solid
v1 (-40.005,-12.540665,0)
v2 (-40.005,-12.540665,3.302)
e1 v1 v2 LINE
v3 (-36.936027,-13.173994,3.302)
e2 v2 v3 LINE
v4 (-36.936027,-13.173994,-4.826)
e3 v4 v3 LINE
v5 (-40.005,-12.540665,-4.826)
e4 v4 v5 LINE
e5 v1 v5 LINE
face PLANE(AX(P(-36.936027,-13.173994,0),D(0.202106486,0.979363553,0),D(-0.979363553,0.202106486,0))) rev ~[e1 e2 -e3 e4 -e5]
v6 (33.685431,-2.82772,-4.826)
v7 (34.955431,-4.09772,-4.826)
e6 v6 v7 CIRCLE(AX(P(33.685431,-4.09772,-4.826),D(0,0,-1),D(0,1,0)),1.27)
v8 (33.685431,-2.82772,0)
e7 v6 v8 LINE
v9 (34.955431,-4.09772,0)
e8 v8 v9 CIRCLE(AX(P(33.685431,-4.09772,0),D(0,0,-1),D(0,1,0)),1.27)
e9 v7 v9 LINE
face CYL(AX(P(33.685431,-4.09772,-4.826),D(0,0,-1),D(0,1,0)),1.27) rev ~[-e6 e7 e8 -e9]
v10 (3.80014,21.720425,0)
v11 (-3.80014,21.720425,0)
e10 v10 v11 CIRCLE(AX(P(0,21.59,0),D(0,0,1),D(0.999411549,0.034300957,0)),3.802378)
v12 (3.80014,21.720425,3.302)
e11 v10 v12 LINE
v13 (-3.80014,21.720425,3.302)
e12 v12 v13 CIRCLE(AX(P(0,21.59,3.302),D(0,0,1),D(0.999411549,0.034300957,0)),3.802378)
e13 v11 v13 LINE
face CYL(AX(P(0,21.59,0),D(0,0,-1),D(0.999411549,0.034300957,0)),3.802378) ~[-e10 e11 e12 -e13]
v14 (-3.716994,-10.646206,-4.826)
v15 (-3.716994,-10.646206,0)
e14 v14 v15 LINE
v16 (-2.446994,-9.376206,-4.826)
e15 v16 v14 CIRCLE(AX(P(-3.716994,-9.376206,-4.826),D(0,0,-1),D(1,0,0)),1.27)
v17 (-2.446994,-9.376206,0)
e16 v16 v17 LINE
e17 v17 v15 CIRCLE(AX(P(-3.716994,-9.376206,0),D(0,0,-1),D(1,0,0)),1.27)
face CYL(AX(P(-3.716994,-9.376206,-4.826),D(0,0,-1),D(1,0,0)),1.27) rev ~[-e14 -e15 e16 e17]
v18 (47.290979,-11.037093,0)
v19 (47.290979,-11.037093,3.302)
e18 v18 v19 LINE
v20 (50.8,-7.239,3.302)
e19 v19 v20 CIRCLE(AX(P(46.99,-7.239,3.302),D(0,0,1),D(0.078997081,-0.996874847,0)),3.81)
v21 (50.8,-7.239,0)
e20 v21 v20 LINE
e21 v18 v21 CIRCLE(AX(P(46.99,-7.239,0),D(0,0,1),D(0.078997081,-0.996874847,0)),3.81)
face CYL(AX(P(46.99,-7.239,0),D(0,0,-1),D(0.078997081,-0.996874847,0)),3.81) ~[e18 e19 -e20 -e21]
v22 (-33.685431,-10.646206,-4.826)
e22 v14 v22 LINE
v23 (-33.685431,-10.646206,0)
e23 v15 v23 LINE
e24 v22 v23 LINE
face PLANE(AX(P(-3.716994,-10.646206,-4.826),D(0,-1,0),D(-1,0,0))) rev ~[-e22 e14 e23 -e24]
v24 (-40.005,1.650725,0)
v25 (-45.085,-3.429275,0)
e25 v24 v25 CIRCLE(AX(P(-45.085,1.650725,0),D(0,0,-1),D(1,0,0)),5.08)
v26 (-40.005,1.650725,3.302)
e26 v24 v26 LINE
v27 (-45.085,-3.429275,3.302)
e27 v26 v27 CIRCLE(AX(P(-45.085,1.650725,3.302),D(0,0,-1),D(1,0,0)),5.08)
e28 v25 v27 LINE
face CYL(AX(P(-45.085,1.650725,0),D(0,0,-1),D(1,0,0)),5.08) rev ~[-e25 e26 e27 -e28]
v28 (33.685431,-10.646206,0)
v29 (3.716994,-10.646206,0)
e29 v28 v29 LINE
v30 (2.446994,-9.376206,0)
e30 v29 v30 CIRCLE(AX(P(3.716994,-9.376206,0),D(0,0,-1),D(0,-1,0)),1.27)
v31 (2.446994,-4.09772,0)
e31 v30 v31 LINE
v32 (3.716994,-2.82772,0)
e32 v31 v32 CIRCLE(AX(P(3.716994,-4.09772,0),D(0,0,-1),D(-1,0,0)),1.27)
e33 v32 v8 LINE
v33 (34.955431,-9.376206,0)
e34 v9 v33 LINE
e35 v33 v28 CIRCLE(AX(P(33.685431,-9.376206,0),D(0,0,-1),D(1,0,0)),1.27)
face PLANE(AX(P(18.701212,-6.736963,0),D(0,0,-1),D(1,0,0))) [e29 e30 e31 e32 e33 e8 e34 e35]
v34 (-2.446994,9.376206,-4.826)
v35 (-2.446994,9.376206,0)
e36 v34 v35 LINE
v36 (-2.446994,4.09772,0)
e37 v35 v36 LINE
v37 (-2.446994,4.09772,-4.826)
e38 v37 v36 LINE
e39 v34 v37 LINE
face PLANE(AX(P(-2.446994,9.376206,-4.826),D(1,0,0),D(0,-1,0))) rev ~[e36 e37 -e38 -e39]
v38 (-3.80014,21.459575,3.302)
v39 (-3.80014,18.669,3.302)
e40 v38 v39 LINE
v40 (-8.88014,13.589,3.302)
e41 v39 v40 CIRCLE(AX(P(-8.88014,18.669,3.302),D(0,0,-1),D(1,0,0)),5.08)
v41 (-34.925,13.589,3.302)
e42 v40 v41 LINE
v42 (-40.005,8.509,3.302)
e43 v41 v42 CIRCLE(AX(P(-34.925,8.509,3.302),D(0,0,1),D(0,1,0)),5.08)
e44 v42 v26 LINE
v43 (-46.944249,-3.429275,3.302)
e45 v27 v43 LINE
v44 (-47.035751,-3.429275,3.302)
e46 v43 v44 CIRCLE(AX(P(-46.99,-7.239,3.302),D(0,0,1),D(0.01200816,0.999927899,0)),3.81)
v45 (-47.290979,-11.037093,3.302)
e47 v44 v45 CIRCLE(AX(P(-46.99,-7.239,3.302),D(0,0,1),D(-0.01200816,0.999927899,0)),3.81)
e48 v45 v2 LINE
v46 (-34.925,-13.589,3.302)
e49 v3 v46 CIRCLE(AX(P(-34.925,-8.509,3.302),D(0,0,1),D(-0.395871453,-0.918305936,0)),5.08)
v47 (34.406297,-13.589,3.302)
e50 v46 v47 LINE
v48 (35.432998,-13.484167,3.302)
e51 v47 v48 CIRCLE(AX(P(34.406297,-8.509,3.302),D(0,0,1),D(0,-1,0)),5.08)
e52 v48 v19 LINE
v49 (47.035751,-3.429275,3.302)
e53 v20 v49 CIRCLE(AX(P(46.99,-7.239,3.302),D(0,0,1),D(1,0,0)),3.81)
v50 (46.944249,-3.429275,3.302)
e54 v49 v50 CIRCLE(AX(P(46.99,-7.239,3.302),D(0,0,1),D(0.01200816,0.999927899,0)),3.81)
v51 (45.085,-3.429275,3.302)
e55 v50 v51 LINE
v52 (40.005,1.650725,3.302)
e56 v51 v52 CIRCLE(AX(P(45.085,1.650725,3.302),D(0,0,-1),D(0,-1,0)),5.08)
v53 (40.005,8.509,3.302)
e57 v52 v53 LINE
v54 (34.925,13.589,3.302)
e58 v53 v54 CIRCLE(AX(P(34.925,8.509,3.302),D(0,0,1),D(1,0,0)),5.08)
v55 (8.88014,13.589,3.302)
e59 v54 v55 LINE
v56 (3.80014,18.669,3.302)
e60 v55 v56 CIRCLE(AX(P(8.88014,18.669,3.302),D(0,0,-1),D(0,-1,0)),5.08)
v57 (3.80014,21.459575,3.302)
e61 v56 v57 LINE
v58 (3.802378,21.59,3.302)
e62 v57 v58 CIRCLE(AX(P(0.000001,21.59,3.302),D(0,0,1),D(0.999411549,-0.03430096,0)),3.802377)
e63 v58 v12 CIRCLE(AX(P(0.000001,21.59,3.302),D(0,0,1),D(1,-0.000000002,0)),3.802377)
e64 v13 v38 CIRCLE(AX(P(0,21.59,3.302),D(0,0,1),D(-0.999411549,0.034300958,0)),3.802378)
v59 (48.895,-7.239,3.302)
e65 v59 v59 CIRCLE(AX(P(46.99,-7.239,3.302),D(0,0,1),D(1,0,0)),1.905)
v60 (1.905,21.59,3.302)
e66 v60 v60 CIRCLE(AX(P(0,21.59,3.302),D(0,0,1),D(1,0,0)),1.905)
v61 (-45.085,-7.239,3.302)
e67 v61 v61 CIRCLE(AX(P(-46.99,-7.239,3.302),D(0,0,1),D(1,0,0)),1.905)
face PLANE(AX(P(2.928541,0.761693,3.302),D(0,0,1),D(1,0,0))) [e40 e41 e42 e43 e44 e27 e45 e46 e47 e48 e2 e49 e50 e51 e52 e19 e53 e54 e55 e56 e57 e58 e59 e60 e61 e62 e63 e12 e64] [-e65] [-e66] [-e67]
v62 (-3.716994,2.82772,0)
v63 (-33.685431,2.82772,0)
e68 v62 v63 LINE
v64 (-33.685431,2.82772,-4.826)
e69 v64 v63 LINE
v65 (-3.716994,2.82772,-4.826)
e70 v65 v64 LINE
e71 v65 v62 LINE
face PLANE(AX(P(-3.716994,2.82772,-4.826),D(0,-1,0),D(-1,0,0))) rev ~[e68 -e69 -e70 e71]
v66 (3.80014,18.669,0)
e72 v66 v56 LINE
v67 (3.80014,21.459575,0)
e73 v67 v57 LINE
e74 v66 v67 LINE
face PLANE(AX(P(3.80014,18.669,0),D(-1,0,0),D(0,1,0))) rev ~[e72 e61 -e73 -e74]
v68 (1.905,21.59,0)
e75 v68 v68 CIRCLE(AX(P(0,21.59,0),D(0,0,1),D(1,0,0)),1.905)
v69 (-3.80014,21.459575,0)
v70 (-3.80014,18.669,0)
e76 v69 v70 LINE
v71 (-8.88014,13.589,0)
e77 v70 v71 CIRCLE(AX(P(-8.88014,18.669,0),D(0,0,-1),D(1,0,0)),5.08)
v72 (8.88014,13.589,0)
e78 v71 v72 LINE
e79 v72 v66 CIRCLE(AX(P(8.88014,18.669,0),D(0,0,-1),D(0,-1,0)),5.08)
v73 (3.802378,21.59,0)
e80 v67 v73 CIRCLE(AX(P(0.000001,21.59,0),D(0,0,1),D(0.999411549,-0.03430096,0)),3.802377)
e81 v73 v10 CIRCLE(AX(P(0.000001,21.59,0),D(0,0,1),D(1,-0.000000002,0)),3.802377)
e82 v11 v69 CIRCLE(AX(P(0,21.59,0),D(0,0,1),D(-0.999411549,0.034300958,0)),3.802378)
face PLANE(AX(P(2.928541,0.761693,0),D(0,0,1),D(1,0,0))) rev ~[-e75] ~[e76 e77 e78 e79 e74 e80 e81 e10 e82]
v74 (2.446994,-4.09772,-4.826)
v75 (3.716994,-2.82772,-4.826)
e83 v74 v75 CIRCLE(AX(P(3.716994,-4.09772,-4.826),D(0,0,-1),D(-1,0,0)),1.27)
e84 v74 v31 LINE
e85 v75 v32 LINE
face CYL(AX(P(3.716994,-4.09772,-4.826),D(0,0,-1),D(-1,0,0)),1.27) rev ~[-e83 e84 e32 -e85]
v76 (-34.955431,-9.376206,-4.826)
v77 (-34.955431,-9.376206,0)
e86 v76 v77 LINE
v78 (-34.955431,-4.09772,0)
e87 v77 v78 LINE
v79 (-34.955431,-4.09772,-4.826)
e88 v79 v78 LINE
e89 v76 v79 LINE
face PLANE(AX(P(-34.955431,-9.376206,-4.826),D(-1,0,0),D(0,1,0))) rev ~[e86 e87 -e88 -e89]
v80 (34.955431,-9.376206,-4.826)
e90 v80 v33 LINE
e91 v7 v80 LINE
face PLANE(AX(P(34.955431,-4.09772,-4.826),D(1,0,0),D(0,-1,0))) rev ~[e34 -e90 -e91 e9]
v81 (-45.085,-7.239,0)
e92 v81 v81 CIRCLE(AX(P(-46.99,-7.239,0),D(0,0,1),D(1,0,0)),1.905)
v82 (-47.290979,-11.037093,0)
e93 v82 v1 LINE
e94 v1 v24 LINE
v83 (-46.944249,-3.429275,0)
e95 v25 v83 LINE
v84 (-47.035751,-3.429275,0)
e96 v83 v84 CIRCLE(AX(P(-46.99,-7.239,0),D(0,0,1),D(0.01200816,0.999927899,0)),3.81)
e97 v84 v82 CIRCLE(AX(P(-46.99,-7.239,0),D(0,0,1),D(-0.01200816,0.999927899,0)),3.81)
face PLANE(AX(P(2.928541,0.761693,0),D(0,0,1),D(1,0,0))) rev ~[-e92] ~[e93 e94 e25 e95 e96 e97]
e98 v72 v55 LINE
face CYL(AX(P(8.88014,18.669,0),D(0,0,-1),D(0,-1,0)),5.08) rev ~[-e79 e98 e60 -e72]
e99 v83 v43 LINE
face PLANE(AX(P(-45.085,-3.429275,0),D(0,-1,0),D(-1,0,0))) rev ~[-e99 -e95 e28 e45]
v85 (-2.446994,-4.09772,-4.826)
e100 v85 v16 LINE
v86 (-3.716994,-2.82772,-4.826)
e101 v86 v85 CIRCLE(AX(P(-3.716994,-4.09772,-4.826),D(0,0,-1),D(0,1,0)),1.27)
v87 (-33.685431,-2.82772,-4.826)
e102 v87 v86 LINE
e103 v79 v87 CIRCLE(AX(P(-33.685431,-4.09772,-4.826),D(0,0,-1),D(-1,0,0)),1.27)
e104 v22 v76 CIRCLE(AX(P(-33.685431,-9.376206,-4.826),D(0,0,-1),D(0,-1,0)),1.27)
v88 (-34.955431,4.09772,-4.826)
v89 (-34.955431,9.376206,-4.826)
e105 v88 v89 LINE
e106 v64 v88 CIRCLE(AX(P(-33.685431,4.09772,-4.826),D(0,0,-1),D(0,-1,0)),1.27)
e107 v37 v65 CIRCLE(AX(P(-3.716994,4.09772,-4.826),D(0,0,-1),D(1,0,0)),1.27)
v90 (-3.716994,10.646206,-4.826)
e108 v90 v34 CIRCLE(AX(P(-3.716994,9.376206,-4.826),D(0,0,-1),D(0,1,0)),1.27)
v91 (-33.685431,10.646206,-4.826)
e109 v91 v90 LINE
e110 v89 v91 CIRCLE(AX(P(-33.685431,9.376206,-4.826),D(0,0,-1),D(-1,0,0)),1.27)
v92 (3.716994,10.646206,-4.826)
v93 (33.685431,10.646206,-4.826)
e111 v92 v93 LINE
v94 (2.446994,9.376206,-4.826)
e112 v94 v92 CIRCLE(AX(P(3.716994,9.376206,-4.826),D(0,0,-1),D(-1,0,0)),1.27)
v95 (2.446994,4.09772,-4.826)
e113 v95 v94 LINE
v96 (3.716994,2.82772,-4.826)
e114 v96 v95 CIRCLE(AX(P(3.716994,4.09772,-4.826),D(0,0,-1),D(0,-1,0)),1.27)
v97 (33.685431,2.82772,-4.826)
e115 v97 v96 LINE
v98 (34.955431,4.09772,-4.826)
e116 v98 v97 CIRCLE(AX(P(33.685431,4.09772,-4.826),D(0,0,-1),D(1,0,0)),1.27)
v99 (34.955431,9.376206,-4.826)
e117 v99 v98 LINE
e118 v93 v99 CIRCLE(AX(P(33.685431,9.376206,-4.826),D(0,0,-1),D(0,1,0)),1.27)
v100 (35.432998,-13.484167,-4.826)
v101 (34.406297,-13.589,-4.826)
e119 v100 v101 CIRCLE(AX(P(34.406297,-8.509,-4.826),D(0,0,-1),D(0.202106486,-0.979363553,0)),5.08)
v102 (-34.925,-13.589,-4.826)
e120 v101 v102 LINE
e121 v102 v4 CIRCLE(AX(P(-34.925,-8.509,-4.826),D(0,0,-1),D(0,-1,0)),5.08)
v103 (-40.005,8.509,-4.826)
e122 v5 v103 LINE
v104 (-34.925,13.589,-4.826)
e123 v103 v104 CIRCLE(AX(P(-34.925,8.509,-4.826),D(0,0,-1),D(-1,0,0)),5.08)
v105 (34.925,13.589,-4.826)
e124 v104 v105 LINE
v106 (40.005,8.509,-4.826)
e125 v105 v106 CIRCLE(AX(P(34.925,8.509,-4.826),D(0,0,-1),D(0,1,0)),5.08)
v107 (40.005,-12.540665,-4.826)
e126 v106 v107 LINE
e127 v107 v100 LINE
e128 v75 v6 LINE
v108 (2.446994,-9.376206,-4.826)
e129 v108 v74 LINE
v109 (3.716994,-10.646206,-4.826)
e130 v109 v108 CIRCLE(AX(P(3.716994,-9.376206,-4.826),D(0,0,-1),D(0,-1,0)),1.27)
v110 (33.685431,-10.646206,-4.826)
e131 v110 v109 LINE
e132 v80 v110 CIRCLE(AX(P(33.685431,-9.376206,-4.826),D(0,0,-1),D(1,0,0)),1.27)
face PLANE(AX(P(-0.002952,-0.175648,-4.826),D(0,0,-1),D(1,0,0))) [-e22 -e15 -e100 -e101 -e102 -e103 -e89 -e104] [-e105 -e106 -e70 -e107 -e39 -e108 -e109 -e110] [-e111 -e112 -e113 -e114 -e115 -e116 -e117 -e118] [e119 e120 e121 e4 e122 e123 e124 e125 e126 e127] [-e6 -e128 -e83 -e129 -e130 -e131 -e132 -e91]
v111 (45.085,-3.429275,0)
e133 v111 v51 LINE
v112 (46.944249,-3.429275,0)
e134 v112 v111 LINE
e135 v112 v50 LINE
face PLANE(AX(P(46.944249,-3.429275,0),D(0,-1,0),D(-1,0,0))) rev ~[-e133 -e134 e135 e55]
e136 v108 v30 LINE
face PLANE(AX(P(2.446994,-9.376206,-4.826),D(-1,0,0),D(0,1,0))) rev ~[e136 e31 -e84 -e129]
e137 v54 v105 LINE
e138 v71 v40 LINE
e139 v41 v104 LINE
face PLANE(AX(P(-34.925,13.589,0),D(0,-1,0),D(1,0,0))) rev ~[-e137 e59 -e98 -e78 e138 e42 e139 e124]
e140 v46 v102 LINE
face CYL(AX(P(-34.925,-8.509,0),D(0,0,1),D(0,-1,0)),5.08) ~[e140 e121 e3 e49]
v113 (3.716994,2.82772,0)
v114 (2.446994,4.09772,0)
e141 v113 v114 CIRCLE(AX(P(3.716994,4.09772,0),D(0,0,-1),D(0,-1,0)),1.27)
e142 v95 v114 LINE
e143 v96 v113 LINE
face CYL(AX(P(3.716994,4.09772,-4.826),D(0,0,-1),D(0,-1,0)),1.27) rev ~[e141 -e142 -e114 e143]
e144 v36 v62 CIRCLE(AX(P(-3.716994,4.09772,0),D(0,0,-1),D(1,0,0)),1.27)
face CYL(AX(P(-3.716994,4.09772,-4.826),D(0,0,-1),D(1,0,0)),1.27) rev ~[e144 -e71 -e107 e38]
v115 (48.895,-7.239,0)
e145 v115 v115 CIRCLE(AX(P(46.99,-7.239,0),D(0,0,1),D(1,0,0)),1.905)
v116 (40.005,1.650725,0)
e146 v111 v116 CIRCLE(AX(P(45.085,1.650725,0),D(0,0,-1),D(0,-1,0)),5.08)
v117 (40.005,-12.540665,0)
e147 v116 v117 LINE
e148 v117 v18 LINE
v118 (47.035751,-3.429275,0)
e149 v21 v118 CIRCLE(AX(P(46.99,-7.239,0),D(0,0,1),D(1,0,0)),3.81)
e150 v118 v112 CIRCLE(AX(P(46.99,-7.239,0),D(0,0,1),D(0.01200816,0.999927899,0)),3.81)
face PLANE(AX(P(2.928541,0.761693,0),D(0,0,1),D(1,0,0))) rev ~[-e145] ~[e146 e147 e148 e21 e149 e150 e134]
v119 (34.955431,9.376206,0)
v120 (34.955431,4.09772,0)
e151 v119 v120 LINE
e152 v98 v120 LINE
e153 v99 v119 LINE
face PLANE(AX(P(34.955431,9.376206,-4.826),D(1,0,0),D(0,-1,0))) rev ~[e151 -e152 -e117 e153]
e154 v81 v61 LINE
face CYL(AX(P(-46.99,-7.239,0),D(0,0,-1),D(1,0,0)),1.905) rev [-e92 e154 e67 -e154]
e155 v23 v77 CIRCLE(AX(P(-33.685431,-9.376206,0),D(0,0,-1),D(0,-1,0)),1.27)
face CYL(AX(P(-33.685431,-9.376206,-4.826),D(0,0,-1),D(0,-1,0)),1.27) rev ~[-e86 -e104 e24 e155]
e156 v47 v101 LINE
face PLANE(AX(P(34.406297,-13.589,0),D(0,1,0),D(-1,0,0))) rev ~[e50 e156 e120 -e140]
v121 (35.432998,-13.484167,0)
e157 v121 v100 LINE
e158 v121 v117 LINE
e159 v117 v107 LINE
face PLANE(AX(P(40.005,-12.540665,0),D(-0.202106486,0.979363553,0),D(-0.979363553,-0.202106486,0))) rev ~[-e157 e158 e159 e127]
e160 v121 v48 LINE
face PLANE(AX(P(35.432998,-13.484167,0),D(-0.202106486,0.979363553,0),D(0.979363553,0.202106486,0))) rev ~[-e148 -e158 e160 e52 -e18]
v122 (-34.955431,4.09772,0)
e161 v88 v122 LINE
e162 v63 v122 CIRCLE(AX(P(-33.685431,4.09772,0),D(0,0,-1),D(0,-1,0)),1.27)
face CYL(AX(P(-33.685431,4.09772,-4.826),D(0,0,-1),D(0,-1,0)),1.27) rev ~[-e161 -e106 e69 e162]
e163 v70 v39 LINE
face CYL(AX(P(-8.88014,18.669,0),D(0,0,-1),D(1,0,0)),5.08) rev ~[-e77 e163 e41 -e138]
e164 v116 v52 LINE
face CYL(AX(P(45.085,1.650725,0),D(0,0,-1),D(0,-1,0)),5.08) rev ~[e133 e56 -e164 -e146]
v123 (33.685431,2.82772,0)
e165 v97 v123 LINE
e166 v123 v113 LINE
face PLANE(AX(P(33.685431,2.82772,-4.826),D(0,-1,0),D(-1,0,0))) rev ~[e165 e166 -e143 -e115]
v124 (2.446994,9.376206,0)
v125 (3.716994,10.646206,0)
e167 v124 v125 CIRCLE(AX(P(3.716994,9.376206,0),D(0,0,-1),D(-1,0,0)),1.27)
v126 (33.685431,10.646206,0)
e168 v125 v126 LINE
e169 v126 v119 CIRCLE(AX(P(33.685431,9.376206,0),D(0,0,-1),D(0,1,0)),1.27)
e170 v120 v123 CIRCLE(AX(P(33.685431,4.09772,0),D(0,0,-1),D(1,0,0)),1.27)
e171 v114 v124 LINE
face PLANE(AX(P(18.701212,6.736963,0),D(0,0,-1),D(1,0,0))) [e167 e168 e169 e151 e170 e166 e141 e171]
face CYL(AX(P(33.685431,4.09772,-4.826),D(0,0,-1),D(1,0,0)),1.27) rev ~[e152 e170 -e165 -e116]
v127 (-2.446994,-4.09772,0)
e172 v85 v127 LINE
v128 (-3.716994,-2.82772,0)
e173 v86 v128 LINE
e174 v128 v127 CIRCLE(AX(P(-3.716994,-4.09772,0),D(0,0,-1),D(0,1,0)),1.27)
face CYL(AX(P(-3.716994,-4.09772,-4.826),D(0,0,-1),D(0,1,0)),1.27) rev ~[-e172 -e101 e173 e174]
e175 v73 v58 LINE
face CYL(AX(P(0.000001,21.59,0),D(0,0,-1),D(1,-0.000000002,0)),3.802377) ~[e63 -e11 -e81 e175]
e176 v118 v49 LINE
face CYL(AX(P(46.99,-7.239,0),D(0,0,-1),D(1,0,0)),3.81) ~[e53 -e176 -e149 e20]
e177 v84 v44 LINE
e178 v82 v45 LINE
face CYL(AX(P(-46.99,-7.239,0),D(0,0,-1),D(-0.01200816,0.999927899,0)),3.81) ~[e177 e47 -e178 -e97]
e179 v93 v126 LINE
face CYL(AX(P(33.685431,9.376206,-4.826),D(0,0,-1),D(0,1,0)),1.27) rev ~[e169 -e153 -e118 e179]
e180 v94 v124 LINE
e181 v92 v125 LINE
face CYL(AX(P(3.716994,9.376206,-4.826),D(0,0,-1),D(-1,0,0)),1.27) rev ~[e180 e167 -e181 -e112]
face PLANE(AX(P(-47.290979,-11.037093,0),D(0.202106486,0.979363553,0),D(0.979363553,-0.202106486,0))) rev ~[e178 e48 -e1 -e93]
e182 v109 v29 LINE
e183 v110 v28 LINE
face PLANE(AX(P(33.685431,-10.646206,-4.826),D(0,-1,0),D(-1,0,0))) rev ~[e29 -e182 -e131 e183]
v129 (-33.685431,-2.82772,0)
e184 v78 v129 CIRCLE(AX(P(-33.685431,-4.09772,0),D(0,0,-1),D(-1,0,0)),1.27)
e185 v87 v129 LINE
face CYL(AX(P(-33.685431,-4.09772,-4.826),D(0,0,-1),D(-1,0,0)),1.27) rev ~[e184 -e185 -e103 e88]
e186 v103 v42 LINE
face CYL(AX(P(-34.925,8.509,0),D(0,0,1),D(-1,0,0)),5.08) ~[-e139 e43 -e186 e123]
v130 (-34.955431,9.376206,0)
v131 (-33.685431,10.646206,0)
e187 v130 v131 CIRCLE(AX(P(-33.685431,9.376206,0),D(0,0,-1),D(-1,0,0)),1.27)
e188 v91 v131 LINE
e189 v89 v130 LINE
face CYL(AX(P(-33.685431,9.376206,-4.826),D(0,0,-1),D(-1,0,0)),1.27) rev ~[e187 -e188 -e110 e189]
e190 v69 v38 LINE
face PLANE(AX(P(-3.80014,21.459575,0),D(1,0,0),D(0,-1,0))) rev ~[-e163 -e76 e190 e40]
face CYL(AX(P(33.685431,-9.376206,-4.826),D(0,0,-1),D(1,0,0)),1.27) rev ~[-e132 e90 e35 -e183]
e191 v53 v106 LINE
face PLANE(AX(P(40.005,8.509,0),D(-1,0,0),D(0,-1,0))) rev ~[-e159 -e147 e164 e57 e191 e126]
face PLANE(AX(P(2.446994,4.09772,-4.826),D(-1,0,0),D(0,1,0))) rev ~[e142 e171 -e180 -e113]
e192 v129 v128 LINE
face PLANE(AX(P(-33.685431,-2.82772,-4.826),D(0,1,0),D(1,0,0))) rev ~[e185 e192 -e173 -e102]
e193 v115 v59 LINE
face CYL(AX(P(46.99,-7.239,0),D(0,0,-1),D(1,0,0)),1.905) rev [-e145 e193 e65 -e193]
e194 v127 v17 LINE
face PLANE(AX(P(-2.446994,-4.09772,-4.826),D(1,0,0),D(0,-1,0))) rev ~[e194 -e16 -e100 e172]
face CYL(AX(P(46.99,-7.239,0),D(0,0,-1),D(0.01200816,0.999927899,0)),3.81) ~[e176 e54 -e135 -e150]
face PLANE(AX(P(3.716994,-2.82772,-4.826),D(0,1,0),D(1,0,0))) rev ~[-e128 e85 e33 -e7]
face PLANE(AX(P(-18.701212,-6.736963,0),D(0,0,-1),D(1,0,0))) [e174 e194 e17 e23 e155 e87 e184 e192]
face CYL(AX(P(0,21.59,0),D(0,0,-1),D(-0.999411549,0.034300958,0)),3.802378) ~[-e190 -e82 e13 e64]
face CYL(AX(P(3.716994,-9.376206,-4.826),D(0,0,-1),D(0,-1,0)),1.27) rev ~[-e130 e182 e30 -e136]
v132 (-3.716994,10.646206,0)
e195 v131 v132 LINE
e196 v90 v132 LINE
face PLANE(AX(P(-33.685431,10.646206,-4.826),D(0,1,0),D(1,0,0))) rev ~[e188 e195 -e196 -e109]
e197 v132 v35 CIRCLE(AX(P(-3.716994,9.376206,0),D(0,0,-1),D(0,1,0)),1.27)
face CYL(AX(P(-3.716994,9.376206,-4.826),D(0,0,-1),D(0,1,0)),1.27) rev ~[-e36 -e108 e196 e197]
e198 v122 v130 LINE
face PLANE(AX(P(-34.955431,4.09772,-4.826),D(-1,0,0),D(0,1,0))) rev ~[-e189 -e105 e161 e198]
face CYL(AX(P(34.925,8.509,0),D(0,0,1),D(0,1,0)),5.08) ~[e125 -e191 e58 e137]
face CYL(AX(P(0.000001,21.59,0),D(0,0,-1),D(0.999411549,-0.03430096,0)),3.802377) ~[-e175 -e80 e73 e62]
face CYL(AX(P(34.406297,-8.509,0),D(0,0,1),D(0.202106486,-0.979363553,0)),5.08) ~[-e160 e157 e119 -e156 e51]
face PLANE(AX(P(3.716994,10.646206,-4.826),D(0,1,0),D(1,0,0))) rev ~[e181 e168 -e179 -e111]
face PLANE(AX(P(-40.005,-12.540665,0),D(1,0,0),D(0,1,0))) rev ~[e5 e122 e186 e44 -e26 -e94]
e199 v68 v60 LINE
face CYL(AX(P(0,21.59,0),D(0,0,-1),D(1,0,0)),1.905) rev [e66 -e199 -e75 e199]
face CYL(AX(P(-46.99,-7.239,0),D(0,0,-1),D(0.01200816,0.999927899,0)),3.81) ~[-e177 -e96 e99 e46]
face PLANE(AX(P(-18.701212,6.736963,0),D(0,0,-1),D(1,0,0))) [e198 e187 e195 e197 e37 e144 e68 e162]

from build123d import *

# Parameters (mm, degrees)
F0_R     = 1.905
F1_DEPTH = 3.302
F3_DEPTH = 4.826
F5_DEPTH = 4.826


# Not quite as in the source:
# - a feature names something its author has since deleted; it is built from what else it names


with BuildPart() as f1:
    # F0 (on Top) → F1 (new body)
    with BuildSketch(Plane.XY):
        with BuildLine():
            Line((-8.8801402367, 13.589), (-34.925, 13.589))
            ThreePointArc((-34.925, 13.589), (-38.5171024484, 12.1011024484), (-40.005, 8.509))
            Line((-40.005, 8.509), (-40.005, 1.6507252969))
            Line((-40.005, 1.6507252969), (-40.005, -12.5406651425))
            Line((-40.005, -12.5406651425), (-36.9360269804, -13.1739941569))
            ThreePointArc((-36.9360269804, -13.1739941569), (-35.9517009503, -13.4841668473), (-34.925, -13.589))
            Line((-34.925, -13.589), (34.4062974357, -13.589))
            ThreePointArc((34.4062974357, -13.589), (34.9223170166, -13.562723755), (35.4329983861, -13.4841668473))
            Line((35.4329983861, -13.4841668473), (47.2909788792, -11.0370931682))
            ThreePointArc((47.2909788792, -11.0370931682), (43.1839507681, -7.4124625154), (46.9442489114, -3.4292747031))
            Line((46.9442489114, -3.4292747031), (45.085, -3.4292747031))
            ThreePointArc((45.085, -3.4292747031), (41.4928975516, -1.9413771515), (40.005, 1.6507252969))
            Line((40.005, 1.6507252969), (40.005, 8.509))
            ThreePointArc((40.005, 8.509), (38.5171024484, 12.1011024484), (34.925, 13.589))
            Line((34.925, 13.589), (8.8801402367, 13.589))
            ThreePointArc((8.8801402367, 13.589), (5.2880377883, 15.0768975516), (3.8001402367, 18.669))
            Line((3.8001402367, 18.669), (3.8001402367, 21.4595748034))
            ThreePointArc((3.8001402367, 21.4595748034), (0, 17.7876222504), (-3.8001402367, 21.4595748034))
            Line((-3.8001402367, 21.4595748034), (-3.8001402367, 18.669))
            ThreePointArc((-3.8001402367, 18.669), (-5.2880377883, 15.0768975516), (-8.8801402367, 13.589))
        make_face()
        with BuildLine():
            Line((-40.005, -12.5406651425), (-40.005, 1.6507252969))
            ThreePointArc((-40.005, 1.6507252969), (-41.4928975516, -1.9413771515), (-45.085, -3.4292747031))
            Line((-45.085, -3.4292747031), (-46.9442489114, -3.4292747031))
            ThreePointArc((-46.9442489114, -3.4292747031), (-44.2797959812, -4.5611474693), (-43.18, -7.239))
            ThreePointArc((-43.18, -7.239), (-44.4045241763, -10.0374665024), (-47.2909788792, -11.0370931682))
            Line((-47.2909788792, -11.0370931682), (-40.005, -12.5406651425))
        make_face()
        with BuildLine():
            Line((-3.8001402367, 21.7204251966), (-3.8001402367, 21.4595748034))
            ThreePointArc((-3.8001402367, 21.4595748034), (0, 17.7876222504), (3.8001402367, 21.4595748034))
            Line((3.8001402367, 21.4595748034), (3.8001402367, 21.7204251966))
            ThreePointArc((3.8001402367, 21.7204251966), (0, 25.3923777496), (-3.8001402367, 21.7204251966))
        make_face()
        with Locations((0, 21.59)):
            Circle(F0_R, mode=Mode.SUBTRACT)
        with BuildLine():
            ThreePointArc((-3.8001402367, 21.7204251966), (-3.8023777496, 21.59), (-3.8001402367, 21.4595748034))
            Line((-3.8001402367, 21.4595748034), (-3.8001402367, 21.7204251966))
        make_face()
        with BuildLine():
            Line((3.8001402367, 21.7204251966), (3.8001402367, 21.4595748034))
            ThreePointArc((3.8001402367, 21.4595748034), (3.8018183303, 21.524777806), (3.8023777496, 21.59))
            ThreePointArc((3.8023777496, 21.59), (3.8018183303, 21.655222194), (3.8001402367, 21.7204251966))
        make_face()
        with BuildLine():
            Line((-47.0357510886, -3.4292747031), (-46.9442489114, -3.4292747031))
            ThreePointArc((-46.9442489114, -3.4292747031), (-46.99, -3.429), (-47.0357510886, -3.4292747031))
        make_face()
        with BuildLine():
            ThreePointArc((-43.18, -7.239), (-44.2797959812, -4.5611474693), (-46.9442489114, -3.4292747031))
            Line((-46.9442489114, -3.4292747031), (-47.0357510886, -3.4292747031))
            ThreePointArc((-47.0357510886, -3.4292747031), (-50.7978577793, -7.1112536385), (-47.2909788792, -11.0370931682))
            ThreePointArc((-47.2909788792, -11.0370931682), (-44.4045241763, -10.0374665024), (-43.18, -7.239))
        make_face()
        with Locations((-46.99, -7.239)):
            Circle(F0_R, mode=Mode.SUBTRACT)
        with BuildLine():
            ThreePointArc((46.9442489114, -3.4292747031), (43.1839507681, -7.4124625154), (47.2909788792, -11.0370931682))
            ThreePointArc((47.2909788792, -11.0370931682), (49.7884665024, -9.8244758237), (50.8, -7.239))
            ThreePointArc((50.8, -7.239), (49.7002040188, -4.5611474693), (47.0357510886, -3.4292747031))
            Line((47.0357510886, -3.4292747031), (46.9442489114, -3.4292747031))
        make_face()
        with Locations((46.99, -7.239)):
            Circle(F0_R, mode=Mode.SUBTRACT)
        with BuildLine():
            ThreePointArc((47.0357510886, -3.4292747031), (46.99, -3.429), (46.9442489114, -3.4292747031))
            Line((46.9442489114, -3.4292747031), (47.0357510886, -3.4292747031))
        make_face()
    extrude(amount=F1_DEPTH)

    # F2 (on face) → F3 (join)
    with BuildSketch(Plane(origin=(0, 0, 0), x_dir=(1, 0, 0), z_dir=(0, 0, -1))):
        with BuildLine():
            Line((-40.005, -1.6507252969), (-40.005, -5.0798626485))
            Line((-40.005, -5.0798626485), (-40.005, -8.509))
            ThreePointArc((-40.005, -8.509), (-38.5171024484, -12.1011024484), (-34.925, -13.589))
            Line((-34.925, -13.589), (-13.1316846237, -13.589))
            Line((-13.1316846237, -13.589), (-8.8801402367, -13.589))
            Line((-8.8801402367, -13.589), (8.8801402367, -13.589))
            Line((8.8801402367, -13.589), (9.6433609724, -13.589))
            Line((9.6433609724, -13.589), (34.925, -13.589))
            ThreePointArc((34.925, -13.589), (38.5171024484, -12.1011024484), (40.005, -8.509))
            Line((40.005, -8.509), (40.005, -5.0798626485))
            Line((40.005, -5.0798626485), (40.005, -1.6507252969))
            Line((40.005, -1.6507252969), (40.005, 12.5406651425))
            Line((40.005, 12.5406651425), (35.4329983861, 13.4841668473))
            ThreePointArc((35.4329983861, 13.4841668473), (34.9223170166, 13.562723755), (34.4062974357, 13.589))
            Line((34.4062974357, 13.589), (-34.925, 13.589))
            ThreePointArc((-34.925, 13.589), (-35.9517009503, 13.4841668473), (-36.9360269804, 13.1739941569))
            Line((-36.9360269804, 13.1739941569), (-40.005, 12.5406651425))
            Line((-40.005, 12.5406651425), (-40.005, -1.6507252969))
        make_face()
    extrude(amount=F3_DEPTH)

    # F4 (on face) → F5 (cut)
    with BuildSketch(Plane(origin=(0, 0, -4.826), x_dir=(1, 0, 0), z_dir=(0, 0, -1))):
        with BuildLine():
            ThreePointArc((-34.9554307759, 4.0977204838), (-34.583456388, 3.1996948717), (-33.6854307759, 2.8277204838))
            Line((-33.6854307759, 2.8277204838), (-3.7169939526, 2.8277204838))
            ThreePointArc((-3.7169939526, 2.8277204838), (-2.8189683405, 3.1996948717), (-2.4469939526, 4.0977204838))
            Line((-2.4469939526, 4.0977204838), (-2.4469939526, 9.3762063268))
            ThreePointArc((-2.4469939526, 9.3762063268), (-2.8189683405, 10.2742319389), (-3.7169939526, 10.6462063268))
            Line((-3.7169939526, 10.6462063268), (-33.6854307759, 10.6462063268))
            ThreePointArc((-33.6854307759, 10.6462063268), (-34.583456388, 10.2742319389), (-34.9554307759, 9.3762063268))
            Line((-34.9554307759, 9.3762063268), (-34.9554307759, 4.0977204838))
        make_face()
        with BuildLine():
            ThreePointArc((3.7169939526, 10.6462063268), (2.8189683405, 10.2742319389), (2.4469939526, 9.3762063268))
            Line((2.4469939526, 9.3762063268), (2.4469939526, 4.0977204838))
            ThreePointArc((2.4469939526, 4.0977204838), (2.8189683405, 3.1996948717), (3.7169939526, 2.8277204838))
            Line((3.7169939526, 2.8277204838), (33.6854307759, 2.8277204838))
            ThreePointArc((33.6854307759, 2.8277204838), (34.583456388, 3.1996948717), (34.9554307759, 4.0977204838))
            Line((34.9554307759, 4.0977204838), (34.9554307759, 9.3762063268))
            ThreePointArc((34.9554307759, 9.3762063268), (34.583456388, 10.2742319389), (33.6854307759, 10.6462063268))
            Line((33.6854307759, 10.6462063268), (3.7169939526, 10.6462063268))
        make_face()
        with BuildLine():
            Line((-3.7169939526, -2.8277204838), (-33.6854307759, -2.8277204838))
            ThreePointArc((-33.6854307759, -2.8277204838), (-34.583456388, -3.1996948717), (-34.9554307759, -4.0977204838))
            Line((-34.9554307759, -4.0977204838), (-34.9554307759, -9.3762063268))
            ThreePointArc((-34.9554307759, -9.3762063268), (-34.583456388, -10.2742319389), (-33.6854307759, -10.6462063268))
            Line((-33.6854307759, -10.6462063268), (-3.7169939526, -10.6462063268))
            ThreePointArc((-3.7169939526, -10.6462063268), (-2.8189683405, -10.2742319389), (-2.4469939526, -9.3762063268))
            Line((-2.4469939526, -9.3762063268), (-2.4469939526, -4.0977204838))
            ThreePointArc((-2.4469939526, -4.0977204838), (-2.8189683405, -3.1996948717), (-3.7169939526, -2.8277204838))
        make_face()
        with BuildLine():
            Line((2.4469939526, -4.0977204838), (2.4469939526, -9.3762063268))
            ThreePointArc((2.4469939526, -9.3762063268), (2.8189683405, -10.2742319389), (3.7169939526, -10.6462063268))
            Line((3.7169939526, -10.6462063268), (33.6854307759, -10.6462063268))
            ThreePointArc((33.6854307759, -10.6462063268), (34.583456388, -10.2742319389), (34.9554307759, -9.3762063268))
            Line((34.9554307759, -9.3762063268), (34.9554307759, -4.0977204838))
            ThreePointArc((34.9554307759, -4.0977204838), (34.583456388, -3.1996948717), (33.6854307759, -2.8277204838))
            Line((33.6854307759, -2.8277204838), (3.7169939526, -2.8277204838))
            ThreePointArc((3.7169939526, -2.8277204838), (2.8189683405, -3.1996948717), (2.4469939526, -4.0977204838))
        make_face()
    extrude(amount=-F5_DEPTH, mode=Mode.SUBTRACT)


solid = f1.part
